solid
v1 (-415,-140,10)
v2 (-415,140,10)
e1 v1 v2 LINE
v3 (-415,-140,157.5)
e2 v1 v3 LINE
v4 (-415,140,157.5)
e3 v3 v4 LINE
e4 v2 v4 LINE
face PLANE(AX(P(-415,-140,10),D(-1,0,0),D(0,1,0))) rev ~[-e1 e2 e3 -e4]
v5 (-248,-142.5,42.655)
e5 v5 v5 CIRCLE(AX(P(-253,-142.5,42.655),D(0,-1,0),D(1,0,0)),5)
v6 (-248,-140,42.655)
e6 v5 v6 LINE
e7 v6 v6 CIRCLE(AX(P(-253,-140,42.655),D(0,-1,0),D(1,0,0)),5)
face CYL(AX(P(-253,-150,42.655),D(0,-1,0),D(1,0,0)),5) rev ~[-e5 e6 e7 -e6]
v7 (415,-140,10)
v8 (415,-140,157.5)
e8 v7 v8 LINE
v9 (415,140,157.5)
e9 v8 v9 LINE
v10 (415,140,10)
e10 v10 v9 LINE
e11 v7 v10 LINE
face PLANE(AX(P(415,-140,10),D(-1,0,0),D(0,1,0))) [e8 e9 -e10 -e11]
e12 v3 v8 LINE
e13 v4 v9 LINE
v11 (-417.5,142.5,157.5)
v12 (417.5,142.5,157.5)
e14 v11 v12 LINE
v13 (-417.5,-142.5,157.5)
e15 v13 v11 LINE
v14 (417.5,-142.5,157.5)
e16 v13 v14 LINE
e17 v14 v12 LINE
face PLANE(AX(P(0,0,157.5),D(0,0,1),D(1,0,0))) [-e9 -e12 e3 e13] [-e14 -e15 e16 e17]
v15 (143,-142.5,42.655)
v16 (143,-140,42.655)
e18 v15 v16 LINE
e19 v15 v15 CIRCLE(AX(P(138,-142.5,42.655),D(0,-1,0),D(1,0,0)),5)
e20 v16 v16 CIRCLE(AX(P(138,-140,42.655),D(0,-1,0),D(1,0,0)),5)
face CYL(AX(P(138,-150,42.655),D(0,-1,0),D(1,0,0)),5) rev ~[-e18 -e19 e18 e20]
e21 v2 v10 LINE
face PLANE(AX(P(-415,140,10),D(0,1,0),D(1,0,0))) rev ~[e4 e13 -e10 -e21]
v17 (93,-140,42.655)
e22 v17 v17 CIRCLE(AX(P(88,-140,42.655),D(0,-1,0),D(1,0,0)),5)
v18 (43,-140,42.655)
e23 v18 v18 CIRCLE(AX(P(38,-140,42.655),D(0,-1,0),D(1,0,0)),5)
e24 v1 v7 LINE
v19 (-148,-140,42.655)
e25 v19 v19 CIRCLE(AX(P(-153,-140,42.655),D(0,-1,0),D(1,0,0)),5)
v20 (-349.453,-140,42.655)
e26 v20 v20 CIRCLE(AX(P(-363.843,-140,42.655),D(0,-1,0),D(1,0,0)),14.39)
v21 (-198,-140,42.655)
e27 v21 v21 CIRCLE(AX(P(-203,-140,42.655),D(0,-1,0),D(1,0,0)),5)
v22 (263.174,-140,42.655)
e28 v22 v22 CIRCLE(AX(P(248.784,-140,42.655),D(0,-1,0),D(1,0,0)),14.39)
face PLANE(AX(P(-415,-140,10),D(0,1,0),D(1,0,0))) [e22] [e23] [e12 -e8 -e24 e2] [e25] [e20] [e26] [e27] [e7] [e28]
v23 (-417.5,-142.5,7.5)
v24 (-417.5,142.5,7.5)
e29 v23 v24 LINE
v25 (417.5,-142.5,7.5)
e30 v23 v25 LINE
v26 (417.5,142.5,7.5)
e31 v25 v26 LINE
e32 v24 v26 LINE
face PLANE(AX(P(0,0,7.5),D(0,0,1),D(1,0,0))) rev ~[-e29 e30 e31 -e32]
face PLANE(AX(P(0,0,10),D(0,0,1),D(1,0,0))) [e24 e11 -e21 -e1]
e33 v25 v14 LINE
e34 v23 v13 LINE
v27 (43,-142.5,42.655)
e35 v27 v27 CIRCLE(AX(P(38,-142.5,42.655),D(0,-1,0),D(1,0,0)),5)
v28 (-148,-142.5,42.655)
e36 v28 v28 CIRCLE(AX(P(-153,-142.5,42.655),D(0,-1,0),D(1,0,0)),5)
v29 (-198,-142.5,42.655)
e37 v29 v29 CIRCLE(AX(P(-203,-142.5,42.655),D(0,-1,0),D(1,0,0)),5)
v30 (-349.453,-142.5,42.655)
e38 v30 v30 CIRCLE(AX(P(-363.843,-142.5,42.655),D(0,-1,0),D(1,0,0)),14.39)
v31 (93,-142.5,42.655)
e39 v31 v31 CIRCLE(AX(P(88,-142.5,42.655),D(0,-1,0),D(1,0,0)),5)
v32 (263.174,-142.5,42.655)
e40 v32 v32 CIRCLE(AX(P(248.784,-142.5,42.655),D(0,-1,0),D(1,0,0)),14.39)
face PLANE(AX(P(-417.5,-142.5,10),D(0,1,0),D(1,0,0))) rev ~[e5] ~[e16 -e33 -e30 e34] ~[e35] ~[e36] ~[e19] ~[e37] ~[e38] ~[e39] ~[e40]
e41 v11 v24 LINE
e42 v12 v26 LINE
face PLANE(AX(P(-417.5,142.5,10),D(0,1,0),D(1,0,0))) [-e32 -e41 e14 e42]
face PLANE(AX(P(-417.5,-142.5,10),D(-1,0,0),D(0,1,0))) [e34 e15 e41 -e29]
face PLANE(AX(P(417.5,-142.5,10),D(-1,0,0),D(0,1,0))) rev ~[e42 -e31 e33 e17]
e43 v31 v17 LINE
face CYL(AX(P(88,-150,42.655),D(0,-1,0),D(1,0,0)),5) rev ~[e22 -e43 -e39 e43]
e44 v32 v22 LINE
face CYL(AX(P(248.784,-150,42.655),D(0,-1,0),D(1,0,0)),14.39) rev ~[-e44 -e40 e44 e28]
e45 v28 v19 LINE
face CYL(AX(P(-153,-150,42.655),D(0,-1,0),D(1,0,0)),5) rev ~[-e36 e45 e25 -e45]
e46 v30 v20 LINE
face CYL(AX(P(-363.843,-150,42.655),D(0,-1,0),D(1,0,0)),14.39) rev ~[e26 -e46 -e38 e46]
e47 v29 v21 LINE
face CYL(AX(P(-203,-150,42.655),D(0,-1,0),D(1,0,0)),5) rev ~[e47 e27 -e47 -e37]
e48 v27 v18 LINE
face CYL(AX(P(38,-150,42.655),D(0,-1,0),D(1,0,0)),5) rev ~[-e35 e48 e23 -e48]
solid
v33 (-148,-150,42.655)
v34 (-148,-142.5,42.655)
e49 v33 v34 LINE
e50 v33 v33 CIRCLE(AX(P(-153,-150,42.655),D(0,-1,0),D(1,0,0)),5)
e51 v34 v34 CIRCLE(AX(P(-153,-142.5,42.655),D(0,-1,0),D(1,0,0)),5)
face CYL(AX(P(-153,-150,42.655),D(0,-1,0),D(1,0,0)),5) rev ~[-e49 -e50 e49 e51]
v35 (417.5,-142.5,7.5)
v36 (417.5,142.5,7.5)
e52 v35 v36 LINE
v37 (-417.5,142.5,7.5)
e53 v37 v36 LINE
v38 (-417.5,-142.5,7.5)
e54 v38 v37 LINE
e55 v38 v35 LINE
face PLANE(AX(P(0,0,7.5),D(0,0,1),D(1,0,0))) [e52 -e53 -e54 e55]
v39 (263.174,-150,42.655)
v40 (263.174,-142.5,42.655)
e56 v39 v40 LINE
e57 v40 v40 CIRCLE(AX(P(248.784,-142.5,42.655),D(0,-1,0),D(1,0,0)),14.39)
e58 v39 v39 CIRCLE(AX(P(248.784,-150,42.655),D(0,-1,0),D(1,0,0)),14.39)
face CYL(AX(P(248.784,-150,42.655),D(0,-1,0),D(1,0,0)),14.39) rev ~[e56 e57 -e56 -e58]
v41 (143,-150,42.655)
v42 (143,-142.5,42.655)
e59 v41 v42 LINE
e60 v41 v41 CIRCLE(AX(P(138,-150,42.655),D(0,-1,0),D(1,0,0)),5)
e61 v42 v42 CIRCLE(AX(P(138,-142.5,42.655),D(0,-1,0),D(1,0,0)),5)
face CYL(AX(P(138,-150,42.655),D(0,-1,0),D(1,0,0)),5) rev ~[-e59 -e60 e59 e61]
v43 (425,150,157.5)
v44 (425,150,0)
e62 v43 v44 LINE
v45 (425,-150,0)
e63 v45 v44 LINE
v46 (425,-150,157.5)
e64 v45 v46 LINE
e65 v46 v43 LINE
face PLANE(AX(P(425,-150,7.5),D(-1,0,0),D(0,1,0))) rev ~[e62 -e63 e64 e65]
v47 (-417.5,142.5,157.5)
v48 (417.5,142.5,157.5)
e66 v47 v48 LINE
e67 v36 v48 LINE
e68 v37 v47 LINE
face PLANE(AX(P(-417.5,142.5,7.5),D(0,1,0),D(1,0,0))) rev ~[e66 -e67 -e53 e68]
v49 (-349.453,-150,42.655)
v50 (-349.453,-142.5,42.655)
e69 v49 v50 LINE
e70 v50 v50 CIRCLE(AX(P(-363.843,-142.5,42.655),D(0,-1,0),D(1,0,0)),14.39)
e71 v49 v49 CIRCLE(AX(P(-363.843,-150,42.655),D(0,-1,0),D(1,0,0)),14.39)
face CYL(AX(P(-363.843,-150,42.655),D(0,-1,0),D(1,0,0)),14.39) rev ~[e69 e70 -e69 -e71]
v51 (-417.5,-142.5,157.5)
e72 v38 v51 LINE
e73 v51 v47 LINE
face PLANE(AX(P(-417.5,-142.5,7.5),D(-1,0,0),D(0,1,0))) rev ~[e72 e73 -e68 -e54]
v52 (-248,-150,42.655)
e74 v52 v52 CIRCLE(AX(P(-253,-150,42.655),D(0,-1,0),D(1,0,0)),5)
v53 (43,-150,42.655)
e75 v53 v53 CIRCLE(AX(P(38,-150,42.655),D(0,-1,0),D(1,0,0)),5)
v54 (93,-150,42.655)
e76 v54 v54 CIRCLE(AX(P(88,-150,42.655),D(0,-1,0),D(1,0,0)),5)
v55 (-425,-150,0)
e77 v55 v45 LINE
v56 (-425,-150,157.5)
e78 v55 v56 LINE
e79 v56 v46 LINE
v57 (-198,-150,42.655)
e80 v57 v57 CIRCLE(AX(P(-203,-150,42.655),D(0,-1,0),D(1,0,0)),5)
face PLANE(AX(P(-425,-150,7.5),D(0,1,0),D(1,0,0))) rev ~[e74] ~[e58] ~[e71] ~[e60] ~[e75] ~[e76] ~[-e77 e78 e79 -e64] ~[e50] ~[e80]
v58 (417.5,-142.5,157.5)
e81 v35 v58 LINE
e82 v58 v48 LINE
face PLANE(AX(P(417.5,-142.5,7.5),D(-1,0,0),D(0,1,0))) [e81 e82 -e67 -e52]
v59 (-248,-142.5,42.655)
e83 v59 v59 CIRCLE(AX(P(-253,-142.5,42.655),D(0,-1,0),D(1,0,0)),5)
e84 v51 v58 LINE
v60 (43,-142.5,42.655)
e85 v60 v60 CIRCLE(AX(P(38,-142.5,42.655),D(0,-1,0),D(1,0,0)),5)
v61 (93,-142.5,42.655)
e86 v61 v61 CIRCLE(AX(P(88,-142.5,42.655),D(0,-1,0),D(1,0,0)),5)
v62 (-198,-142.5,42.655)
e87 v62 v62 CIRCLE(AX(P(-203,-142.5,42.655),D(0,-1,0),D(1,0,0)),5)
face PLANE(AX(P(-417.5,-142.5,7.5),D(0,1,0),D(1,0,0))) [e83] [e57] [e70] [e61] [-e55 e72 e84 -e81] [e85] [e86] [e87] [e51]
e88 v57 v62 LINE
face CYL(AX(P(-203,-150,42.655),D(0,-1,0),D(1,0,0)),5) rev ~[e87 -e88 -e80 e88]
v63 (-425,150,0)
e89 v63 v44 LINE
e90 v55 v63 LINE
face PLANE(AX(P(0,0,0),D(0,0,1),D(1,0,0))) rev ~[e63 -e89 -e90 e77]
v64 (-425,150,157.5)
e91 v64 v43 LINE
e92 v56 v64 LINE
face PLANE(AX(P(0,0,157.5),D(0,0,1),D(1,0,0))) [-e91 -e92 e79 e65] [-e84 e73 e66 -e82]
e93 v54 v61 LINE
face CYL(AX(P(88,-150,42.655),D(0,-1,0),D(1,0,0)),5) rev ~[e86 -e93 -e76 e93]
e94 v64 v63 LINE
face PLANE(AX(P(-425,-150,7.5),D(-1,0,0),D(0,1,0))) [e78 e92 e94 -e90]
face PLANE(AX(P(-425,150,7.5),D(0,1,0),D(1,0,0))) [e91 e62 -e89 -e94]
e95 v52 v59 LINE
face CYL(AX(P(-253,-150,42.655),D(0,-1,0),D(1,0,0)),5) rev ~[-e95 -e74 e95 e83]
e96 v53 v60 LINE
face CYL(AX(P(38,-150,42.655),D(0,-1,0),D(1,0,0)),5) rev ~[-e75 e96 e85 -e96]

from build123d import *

# Parameters (mm, degrees)
F0_W     = 850
F0_H     = 300
F1_DEPTH = 7.5
F2_W     = 850
F2_H     = 300
F2_W_2   = 835
F2_H_2   = 285
F3_DEPTH = 150
F4_DEPTH = 2.5
F5_W     = 835
F5_H     = 285
F5_W_2   = 830
F5_H_2   = 280
F6_DEPTH = 147.5
F7_R     = 5
F7_R_2   = 14.39
F8_DEPTH = 25


with BuildPart() as f1:
    # F0 (on Top) → F1 (new body)
    with BuildSketch(Plane.XY):
        Rectangle(F0_W, F0_H)
    extrude(amount=F1_DEPTH)

    # F2 (on face) → F3 (join)
    with BuildSketch(Plane.XY.offset(7.5)):
        Rectangle(F2_W, F2_H)
        Rectangle(F2_W_2, F2_H_2, mode=Mode.SUBTRACT)
    extrude(amount=F3_DEPTH)


with BuildPart() as f4:
    # F4 (new): a face of the model
    f4_faces = [f1.part.faces().sort_by_distance(p)[0] for p in [
        (0, 0, 7.5),
    ]]
    extrude(f4_faces, amount=F4_DEPTH)

    # F5 (on face) → F6 (join)
    with BuildSketch(Plane.XY.offset(10)):
        Rectangle(F5_W, F5_H)
        Rectangle(F5_W_2, F5_H_2, mode=Mode.SUBTRACT)
    extrude(amount=F6_DEPTH)


with BuildPart() as f8_tool:
    # F7 (on face) → F8 (new body)
    with BuildSketch(Plane.XZ.offset(150)):
        with Locations((-153, 42.655)):
            Circle(F7_R)
        with Locations((38, 42.655)):
            Circle(F7_R)
        with Locations((88, 42.655)):
            Circle(F7_R)
        with Locations((138, 42.655)):
            Circle(F7_R)
        with Locations((-203, 42.655)):
            Circle(F7_R)
        with Locations((-253, 42.655)):
            Circle(F7_R)
        with Locations((248.784, 42.655)):
            Circle(F7_R_2)
        with Locations((-363.843, 42.655)):
            Circle(F7_R_2)
    extrude(amount=-F8_DEPTH)


with BuildPart() as f1_1:
    add(f1.part)

    # F8: cut by f8_tool
    add(f8_tool.part, mode=Mode.SUBTRACT)


with BuildPart() as f4_1:
    add(f4.part)

    # F8: cut by f8_tool
    add(f8_tool.part, mode=Mode.SUBTRACT)


solid = Compound([f1_1.part, f4_1.part])
